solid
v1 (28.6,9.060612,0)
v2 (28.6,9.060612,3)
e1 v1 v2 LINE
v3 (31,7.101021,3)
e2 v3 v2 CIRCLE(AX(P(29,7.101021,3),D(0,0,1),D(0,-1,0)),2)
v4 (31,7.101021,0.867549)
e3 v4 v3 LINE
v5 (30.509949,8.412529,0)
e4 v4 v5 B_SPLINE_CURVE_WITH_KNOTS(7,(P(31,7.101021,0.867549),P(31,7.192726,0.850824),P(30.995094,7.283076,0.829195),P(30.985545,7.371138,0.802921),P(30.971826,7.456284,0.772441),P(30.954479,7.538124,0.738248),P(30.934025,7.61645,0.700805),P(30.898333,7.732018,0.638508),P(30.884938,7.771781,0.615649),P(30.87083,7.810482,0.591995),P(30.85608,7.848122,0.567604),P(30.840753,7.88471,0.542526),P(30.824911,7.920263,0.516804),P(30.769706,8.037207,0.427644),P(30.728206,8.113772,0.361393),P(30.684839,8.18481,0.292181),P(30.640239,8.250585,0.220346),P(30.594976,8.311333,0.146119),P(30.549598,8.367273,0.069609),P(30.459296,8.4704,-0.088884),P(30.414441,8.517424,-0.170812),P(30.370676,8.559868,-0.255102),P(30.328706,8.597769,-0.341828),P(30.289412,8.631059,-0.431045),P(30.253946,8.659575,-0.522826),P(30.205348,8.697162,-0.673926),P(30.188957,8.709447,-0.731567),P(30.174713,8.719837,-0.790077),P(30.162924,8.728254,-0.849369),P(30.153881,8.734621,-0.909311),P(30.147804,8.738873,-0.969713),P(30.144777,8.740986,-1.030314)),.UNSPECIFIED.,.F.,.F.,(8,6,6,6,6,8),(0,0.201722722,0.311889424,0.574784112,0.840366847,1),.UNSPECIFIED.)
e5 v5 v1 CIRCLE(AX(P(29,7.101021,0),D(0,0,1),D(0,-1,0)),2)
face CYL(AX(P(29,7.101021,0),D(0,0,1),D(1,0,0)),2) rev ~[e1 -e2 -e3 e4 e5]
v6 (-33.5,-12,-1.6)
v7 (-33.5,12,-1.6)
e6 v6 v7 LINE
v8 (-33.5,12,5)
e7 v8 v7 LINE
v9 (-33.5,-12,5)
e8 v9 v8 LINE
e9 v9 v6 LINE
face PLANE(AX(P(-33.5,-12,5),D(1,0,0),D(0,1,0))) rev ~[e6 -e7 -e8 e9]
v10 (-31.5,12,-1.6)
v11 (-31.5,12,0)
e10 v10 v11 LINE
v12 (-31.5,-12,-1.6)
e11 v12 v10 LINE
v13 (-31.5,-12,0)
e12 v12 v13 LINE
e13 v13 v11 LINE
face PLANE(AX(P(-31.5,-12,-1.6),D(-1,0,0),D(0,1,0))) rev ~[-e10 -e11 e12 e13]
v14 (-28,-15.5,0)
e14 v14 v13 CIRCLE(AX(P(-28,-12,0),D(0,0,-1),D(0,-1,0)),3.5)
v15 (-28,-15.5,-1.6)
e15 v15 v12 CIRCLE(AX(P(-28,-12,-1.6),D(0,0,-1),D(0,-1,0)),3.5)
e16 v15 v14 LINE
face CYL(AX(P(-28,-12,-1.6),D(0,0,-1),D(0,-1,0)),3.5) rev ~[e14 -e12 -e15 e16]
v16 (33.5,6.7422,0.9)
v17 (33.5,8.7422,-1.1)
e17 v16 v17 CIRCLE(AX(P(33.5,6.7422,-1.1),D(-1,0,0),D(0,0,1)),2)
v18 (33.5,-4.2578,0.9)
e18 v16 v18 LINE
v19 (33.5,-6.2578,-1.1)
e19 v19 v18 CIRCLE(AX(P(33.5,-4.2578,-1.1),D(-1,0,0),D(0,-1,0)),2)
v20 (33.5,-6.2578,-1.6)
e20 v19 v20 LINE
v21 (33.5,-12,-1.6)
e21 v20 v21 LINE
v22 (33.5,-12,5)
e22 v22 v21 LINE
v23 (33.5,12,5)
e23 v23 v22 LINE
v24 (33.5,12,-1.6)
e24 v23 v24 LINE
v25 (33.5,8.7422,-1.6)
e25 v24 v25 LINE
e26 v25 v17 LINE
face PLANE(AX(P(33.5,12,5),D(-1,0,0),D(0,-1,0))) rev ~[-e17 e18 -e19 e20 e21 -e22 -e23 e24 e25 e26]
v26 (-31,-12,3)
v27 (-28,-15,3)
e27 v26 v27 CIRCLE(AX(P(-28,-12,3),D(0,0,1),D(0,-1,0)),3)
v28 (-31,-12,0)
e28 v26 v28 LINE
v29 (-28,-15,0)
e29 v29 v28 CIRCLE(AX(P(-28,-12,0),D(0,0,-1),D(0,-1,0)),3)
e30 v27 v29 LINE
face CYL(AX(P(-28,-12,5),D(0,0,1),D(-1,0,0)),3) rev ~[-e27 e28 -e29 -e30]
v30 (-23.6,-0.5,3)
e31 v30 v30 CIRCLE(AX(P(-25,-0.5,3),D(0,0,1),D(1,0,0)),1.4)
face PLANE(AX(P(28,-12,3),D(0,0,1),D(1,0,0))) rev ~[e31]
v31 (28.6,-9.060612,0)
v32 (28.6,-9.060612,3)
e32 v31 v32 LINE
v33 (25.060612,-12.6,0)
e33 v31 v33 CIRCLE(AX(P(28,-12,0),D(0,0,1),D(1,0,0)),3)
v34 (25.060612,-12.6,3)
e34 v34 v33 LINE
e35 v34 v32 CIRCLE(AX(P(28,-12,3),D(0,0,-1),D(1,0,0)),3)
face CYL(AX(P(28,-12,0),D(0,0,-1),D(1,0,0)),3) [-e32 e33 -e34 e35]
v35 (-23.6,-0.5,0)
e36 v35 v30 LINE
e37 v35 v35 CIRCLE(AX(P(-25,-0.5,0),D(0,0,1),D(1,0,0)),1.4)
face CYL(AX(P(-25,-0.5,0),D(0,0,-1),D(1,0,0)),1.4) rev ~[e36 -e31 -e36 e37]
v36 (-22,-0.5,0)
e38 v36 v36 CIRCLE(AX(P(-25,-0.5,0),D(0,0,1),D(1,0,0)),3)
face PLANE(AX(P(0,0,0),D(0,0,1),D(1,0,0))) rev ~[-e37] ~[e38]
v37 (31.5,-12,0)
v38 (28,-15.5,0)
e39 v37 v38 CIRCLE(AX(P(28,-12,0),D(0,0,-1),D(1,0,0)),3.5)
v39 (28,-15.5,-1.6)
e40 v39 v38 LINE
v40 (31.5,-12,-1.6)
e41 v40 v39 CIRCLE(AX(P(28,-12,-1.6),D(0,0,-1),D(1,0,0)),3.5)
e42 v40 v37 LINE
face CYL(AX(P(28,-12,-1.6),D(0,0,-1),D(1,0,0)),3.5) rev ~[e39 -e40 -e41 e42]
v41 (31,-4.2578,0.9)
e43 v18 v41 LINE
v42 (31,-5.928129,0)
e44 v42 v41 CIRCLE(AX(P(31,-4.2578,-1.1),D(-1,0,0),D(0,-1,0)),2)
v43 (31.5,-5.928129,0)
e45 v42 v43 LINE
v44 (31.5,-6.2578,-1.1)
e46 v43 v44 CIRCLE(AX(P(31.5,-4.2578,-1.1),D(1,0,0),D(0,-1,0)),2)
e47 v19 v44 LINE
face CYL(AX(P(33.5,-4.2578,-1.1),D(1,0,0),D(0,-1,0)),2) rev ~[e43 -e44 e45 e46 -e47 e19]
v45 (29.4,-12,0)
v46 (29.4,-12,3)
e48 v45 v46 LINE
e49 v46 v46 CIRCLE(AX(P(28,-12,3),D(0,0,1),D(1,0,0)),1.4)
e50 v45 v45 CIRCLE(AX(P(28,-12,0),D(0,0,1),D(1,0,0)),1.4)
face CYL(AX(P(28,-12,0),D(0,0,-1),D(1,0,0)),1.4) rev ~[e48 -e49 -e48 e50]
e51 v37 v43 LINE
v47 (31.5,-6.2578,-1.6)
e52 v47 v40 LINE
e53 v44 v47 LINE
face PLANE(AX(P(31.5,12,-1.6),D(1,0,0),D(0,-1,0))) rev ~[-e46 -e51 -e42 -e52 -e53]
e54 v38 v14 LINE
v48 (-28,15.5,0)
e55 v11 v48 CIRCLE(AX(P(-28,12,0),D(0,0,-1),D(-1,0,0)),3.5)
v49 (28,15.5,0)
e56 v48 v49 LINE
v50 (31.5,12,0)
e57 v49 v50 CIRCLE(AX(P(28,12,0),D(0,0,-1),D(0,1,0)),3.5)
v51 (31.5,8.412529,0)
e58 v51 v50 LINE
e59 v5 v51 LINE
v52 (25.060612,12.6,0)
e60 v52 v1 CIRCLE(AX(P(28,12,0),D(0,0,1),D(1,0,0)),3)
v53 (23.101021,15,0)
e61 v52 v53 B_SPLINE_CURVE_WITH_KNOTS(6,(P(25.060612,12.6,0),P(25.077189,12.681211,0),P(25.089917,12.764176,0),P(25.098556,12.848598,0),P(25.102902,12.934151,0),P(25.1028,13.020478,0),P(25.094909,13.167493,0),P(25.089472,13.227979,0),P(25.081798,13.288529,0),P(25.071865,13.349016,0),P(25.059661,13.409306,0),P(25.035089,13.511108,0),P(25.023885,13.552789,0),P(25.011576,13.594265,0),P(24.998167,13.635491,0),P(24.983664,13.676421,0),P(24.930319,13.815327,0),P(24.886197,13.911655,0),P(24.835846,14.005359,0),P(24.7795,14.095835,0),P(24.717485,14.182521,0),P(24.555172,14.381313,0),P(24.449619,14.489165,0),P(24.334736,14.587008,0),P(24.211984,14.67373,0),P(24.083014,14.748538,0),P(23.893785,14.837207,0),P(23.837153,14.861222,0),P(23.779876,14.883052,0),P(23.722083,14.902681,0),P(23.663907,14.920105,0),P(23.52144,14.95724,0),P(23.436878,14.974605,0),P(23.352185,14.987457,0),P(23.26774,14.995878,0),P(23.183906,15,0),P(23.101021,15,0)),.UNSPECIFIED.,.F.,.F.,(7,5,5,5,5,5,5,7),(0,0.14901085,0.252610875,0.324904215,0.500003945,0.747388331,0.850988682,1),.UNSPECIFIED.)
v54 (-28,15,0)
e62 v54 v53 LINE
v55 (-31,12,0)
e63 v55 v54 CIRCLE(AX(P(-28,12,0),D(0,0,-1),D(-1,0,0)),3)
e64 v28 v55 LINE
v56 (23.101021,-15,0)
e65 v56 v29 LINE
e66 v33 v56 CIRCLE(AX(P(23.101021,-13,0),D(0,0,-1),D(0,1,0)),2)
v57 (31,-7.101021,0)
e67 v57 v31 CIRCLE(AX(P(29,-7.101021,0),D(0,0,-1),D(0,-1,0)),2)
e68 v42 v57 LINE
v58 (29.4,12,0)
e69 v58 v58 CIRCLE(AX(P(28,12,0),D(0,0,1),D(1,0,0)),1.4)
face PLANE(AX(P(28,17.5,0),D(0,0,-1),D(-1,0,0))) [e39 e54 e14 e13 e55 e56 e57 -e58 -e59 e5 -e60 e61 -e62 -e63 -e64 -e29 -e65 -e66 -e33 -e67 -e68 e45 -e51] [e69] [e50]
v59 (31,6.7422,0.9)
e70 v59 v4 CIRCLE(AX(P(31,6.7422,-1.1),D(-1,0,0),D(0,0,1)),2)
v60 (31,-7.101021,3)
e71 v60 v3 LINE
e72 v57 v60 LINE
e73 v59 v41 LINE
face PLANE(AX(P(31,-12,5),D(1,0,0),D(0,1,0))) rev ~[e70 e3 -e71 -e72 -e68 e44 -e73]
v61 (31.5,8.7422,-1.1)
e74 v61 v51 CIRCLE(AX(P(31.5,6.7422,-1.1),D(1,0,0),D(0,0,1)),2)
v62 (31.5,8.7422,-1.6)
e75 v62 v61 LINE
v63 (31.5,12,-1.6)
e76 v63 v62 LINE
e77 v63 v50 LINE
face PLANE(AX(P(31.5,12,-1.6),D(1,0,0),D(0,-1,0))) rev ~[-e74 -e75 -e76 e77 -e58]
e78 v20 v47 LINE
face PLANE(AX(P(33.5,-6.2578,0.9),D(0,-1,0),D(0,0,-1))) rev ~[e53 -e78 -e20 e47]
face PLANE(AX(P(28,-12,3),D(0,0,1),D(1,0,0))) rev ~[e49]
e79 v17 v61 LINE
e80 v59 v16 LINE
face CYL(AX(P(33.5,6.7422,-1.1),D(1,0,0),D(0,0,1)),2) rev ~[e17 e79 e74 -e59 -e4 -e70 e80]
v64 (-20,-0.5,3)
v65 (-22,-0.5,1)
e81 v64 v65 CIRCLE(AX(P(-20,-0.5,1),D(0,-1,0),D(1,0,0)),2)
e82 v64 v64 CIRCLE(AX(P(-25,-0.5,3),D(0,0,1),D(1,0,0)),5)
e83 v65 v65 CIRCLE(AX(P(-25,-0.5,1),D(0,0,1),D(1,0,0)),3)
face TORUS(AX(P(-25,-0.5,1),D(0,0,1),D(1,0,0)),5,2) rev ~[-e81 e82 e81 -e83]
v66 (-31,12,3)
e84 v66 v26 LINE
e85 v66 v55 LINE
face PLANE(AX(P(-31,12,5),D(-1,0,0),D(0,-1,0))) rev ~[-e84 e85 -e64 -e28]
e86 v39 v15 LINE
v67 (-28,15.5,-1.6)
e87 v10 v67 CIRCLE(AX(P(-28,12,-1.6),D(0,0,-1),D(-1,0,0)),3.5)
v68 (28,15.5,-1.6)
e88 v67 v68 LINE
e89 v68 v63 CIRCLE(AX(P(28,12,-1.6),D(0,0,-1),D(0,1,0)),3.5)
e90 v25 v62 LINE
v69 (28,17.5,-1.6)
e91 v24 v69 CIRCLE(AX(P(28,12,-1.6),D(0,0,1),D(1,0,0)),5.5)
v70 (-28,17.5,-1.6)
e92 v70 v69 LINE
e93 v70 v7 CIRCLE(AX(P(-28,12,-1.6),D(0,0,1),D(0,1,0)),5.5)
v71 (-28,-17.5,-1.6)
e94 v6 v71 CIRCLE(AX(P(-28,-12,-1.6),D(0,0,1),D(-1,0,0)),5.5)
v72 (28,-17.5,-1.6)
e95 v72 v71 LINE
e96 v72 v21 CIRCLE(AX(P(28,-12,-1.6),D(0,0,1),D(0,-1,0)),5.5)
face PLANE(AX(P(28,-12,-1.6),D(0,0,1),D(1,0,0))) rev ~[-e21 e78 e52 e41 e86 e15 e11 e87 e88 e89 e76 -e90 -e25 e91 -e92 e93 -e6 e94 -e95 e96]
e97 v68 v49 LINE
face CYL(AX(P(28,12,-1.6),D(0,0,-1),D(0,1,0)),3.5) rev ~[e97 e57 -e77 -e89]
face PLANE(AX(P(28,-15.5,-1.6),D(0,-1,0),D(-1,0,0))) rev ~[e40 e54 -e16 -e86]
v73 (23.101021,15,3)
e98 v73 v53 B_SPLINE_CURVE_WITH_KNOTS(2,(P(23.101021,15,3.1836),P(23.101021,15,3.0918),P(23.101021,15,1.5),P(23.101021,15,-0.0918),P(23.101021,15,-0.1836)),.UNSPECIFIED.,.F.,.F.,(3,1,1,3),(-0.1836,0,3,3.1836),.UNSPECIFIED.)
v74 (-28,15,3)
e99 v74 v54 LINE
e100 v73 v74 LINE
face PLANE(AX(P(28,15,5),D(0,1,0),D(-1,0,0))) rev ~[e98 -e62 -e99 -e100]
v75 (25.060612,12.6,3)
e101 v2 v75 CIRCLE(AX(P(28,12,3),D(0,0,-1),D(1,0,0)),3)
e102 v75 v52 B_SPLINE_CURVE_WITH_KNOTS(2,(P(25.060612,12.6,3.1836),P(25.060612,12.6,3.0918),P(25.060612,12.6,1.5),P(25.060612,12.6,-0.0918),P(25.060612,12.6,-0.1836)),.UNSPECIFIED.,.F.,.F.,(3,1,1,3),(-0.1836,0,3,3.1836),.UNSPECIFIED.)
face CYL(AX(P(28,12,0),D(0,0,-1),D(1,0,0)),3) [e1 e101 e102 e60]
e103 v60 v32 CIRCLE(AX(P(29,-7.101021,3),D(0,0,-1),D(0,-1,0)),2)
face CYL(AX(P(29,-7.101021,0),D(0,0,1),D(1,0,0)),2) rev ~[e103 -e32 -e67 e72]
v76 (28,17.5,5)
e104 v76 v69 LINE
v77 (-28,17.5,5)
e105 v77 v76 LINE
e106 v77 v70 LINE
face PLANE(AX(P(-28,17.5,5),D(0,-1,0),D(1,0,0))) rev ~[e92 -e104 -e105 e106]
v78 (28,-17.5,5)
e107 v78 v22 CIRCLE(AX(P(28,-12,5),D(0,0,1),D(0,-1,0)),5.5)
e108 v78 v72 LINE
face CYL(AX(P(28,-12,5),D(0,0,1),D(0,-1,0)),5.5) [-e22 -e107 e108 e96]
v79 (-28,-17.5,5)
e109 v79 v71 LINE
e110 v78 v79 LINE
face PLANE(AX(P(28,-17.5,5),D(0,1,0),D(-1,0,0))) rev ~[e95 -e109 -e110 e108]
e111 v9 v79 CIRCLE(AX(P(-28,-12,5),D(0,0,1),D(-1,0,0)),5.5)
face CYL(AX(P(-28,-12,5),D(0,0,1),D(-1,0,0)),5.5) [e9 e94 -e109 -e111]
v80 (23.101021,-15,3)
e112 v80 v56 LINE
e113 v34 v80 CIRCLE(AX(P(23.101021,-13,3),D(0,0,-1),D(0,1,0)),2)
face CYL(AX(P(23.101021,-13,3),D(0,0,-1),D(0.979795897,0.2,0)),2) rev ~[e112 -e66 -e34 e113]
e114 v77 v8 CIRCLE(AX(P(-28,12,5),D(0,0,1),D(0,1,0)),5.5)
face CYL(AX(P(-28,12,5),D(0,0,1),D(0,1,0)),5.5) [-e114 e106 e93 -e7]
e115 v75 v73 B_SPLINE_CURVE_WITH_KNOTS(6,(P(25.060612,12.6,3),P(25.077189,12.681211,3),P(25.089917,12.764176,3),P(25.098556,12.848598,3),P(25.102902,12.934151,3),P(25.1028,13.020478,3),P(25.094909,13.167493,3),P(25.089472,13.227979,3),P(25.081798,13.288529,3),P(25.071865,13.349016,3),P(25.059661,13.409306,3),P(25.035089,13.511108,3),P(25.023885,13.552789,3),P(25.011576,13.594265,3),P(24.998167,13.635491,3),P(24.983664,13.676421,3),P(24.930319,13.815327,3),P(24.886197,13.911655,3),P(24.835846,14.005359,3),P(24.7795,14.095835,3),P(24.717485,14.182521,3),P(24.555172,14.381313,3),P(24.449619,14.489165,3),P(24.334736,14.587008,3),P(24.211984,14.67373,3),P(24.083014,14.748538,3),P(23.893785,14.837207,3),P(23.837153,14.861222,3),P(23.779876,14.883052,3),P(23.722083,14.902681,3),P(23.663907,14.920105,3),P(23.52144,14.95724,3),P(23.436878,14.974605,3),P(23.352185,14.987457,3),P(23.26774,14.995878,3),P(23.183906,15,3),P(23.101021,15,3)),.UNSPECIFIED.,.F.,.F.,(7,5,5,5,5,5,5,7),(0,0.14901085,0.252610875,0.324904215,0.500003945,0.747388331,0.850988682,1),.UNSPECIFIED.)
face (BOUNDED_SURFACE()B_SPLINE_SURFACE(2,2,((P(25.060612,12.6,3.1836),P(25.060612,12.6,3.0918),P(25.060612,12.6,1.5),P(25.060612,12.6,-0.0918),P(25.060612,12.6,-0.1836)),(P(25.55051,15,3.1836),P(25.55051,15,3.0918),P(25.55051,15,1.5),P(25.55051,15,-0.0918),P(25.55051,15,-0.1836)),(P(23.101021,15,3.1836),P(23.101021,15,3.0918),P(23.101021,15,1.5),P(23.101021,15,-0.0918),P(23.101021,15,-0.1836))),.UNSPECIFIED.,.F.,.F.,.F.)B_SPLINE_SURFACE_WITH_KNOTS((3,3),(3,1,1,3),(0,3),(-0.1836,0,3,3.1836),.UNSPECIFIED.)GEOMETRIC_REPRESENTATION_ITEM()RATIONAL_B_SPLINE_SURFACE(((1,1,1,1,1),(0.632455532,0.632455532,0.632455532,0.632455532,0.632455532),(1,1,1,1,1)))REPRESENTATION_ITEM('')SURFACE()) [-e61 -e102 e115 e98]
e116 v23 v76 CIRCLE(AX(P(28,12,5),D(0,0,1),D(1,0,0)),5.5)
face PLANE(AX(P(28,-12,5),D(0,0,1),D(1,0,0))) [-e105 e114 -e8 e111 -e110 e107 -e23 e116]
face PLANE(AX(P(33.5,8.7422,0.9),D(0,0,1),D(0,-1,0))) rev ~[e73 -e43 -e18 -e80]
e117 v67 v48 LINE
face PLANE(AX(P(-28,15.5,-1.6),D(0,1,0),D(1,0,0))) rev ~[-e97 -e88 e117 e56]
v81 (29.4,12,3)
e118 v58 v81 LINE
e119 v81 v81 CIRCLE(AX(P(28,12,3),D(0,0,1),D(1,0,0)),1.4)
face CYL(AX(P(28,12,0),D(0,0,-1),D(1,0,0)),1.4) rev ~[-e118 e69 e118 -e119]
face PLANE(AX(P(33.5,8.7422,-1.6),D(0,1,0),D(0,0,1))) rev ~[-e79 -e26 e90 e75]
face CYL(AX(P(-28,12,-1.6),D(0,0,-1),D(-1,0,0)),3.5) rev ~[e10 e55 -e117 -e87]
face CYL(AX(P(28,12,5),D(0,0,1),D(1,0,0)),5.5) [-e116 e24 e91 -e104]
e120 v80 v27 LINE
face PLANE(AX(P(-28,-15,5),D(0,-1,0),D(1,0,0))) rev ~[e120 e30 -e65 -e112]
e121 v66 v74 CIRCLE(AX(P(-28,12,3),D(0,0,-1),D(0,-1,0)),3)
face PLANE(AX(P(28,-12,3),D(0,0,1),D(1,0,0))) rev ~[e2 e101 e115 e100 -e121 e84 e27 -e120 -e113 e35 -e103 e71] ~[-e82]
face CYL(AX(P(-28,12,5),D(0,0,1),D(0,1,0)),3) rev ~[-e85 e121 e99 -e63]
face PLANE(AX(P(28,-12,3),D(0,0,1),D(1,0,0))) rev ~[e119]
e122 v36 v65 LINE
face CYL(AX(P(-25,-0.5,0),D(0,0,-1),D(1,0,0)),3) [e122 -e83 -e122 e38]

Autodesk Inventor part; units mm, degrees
ref_plane "YZ Plane" through (0, 0, 0) normal (1, 0, 0) x (0, 1, 0)
ref_plane "XZ Plane" through (0, 0, 0) normal (0, 1, 0) x (-1, 0, 0)
sketch "Sketch1" plane through (0, 0, 0) normal (0, 0, 1) x (1, 0, 0)
  circle A0 centre (28, -12) radius 1.6 construction
  circle A1 centre (-25, -0.5) radius 1.6 construction
  circle A2 centre (28, 12) radius 1.6 construction
  line L0 (-28, -15) -> (28, -15)
  line L1 (-31, 12) -> (-31, -12)
  line L2 (28, 15) -> (-28, 15)
  line L3 (31, -12) -> (31, 12)
  circle A3 centre (28, -12) radius 3
  circle A4 centre (28, 12) radius 3
  circle A5 centre (-25, -0.5) radius 3
  circle A6 centre (28, -12) radius 1.4
  circle A7 centre (28, 12) radius 1.4
  circle A8 centre (-25, -0.5) radius 1.4
  point P0 (0, 0)
extrude "Extrusion1" add sketch "Sketch1" along normal blind 3
sketch "Sketch2" plane through (28, -12, 3) normal (0, 0, 1) x (1, 0, 0)
  line L0 (-59, 24) -> (-59, 0) projected
  line L1 (0, 27) -> (-56, 27) projected
  line L2 (-56, -3) -> (0, -3) projected
  line L3 (3, 0) -> (3, 24) projected
  line L4 (-59, 27) -> (3, 27)
  line L5 (3, 27) -> (3, -3)
  line L6 (3, -3) -> (-59, -3)
  line L7 (-59, -3) -> (-59, 27)
  point P0 (-28, 12)
extrude "Extrusion2" add sketch "Sketch2" along normal blind 2
fillet "Fillet1" radius 3 4 edges at (31, -15, 4) (31, 15, 4) (-31, 15, 4) (-31, -15, 4)
sketch "Sketch3" plane through (28, -12, 5) normal (0, 0, 1) x (1, 0, 0)
  arc A0 (-59, 0) -> (-56, -3) centre (-56, 0) ccw projected
  line L0 (-56, -3) -> (0, -3) projected
  arc A1 (0, -3) -> (3, 0) centre (0, 0) ccw projected
  line L1 (3, 0) -> (3, 24) projected
  arc A2 (3, 24) -> (0, 27) centre (0, 24) ccw projected
  line L2 (0, 27) -> (-56, 27) projected
  arc A3 (-56, 27) -> (-59, 24) centre (-56, 24) ccw projected
  line L3 (-59, 24) -> (-59, 0) projected
  line L4 (5.5, 24) -> (5.5, 0)
  arc A4 (0, -5.5) -> (5.5, 0) centre (0, 0) ccw
  line L5 (0, -5.5) -> (-56, -5.5)
  arc A5 (-61.5, 0) -> (-56, -5.5) centre (-56, 0) ccw
  line L6 (-61.5, 0) -> (-61.5, 24)
  arc A6 (-56, 29.5) -> (-61.5, 24) centre (-56, 24) ccw
  line L7 (-56, 29.5) -> (0, 29.5)
  arc A7 (5.5, 24) -> (0, 29.5) centre (0, 24) ccw
  point P0 (-28, 12)
  dimension "d9" = 2.5
ref_plane "Work Plane1" through (-31, -15, -1.6) normal (0, 0, -1) x (0, 1, 0)
extrude "Extrusion3" add sketch "Sketch3" against normal up to surface (6.6 mm away)
sketch "Sketch4" plane through (28, 17.5, -1.6) normal (0, 0, -1) x (-1, 0, 0)
  arc A0 (59, -5.5) -> (56, -2.5) centre (56, -5.5) ccw projected
  line L0 (59, -29.5) -> (59, -5.5) projected
  arc A1 (56, -32.5) -> (59, -29.5) centre (56, -29.5) ccw projected
  line L1 (0, -32.5) -> (56, -32.5) projected
  arc A2 (-3, -29.5) -> (0, -32.5) centre (0, -29.5) ccw projected
  line L2 (-3, -5.5) -> (-3, -29.5) projected
  arc A3 (0, -2.5) -> (-3, -5.5) centre (0, -5.5) ccw projected
  line L3 (56, -2.5) -> (0, -2.5) projected
  arc A4 (56, -35) -> (61.5, -29.5) centre (56, -29.5) ccw projected
  line L4 (61.5, -5.5) -> (61.5, -29.5) projected
  arc A5 (61.5, -5.5) -> (56, 0) centre (56, -5.5) ccw projected
  line L5 (0, 0) -> (56, 0) projected
  arc A6 (0, 0) -> (-5.5, -5.5) centre (0, -5.5) ccw projected
  line L6 (-5.5, -29.5) -> (-5.5, -5.5) projected
  arc A7 (-5.5, -29.5) -> (0, -35) centre (0, -29.5) ccw projected
  line L7 (56, -35) -> (0, -35) projected
  arc A8 (0, -2) -> (-3.5, -5.5) centre (0, -5.5) ccw
  line L8 (-3.5, -5.5) -> (-3.5, -29.5)
  arc A9 (-3.5, -29.5) -> (0, -33) centre (0, -29.5) ccw
  line L9 (0, -33) -> (56, -33)
  arc A10 (56, -33) -> (59.5, -29.5) centre (56, -29.5) ccw
  line L10 (59.5, -29.5) -> (59.5, -5.5)
  arc A11 (59.5, -5.5) -> (56, -2) centre (56, -5.5) ccw
  line L11 (56, -2) -> (0, -2)
  point P0 (28, -17.5)
  dimension "d12" = 0.5
extrude "Extrusion4" cut sketch "Sketch4" against normal up to surface (1.6 mm away) contours L11 A11 L10 A10 L9 A9 L8 A8
sketch "Sketch5" plane through (33.5, -12, 5) normal (1, 0, 0) x (0, 0, -1)
  line L0 (6.6, 20.7422) -> (10.115, 20.7422) projected
  line L1 (10.115, 5.7422) -> (6.6, 5.7422) projected
  line L2 (6.6, 20.7422) -> (4.1, 20.7422)
  line L3 (4.1, 20.7422) -> (4.1, 5.7422)
  line L4 (4.1, 5.7422) -> (6.6, 5.7422)
  line L5 (6.6, 5.7422) -> (6.6, 20.7422)
  point P0 (5, 12)
  dimension "d15" = 2.5
extrude "Extrusion5" cut sketch "Sketch5" against normal blind 21.75
fillet "Fillet2" radius 2 2 edges at (32.25, 8.7422, 0.9) (32.25, -6.2578, 0.9)
fillet "Fillet3" radius 2 4 edges at (31, 12, 1.5) (28, 15, 1.5) (28, -15, 1.5) (31, -12, 1.5)
fillet "Fillet4" radius 2 1 edges at (-28, -0.5, 3)
properties part number "case_base"
